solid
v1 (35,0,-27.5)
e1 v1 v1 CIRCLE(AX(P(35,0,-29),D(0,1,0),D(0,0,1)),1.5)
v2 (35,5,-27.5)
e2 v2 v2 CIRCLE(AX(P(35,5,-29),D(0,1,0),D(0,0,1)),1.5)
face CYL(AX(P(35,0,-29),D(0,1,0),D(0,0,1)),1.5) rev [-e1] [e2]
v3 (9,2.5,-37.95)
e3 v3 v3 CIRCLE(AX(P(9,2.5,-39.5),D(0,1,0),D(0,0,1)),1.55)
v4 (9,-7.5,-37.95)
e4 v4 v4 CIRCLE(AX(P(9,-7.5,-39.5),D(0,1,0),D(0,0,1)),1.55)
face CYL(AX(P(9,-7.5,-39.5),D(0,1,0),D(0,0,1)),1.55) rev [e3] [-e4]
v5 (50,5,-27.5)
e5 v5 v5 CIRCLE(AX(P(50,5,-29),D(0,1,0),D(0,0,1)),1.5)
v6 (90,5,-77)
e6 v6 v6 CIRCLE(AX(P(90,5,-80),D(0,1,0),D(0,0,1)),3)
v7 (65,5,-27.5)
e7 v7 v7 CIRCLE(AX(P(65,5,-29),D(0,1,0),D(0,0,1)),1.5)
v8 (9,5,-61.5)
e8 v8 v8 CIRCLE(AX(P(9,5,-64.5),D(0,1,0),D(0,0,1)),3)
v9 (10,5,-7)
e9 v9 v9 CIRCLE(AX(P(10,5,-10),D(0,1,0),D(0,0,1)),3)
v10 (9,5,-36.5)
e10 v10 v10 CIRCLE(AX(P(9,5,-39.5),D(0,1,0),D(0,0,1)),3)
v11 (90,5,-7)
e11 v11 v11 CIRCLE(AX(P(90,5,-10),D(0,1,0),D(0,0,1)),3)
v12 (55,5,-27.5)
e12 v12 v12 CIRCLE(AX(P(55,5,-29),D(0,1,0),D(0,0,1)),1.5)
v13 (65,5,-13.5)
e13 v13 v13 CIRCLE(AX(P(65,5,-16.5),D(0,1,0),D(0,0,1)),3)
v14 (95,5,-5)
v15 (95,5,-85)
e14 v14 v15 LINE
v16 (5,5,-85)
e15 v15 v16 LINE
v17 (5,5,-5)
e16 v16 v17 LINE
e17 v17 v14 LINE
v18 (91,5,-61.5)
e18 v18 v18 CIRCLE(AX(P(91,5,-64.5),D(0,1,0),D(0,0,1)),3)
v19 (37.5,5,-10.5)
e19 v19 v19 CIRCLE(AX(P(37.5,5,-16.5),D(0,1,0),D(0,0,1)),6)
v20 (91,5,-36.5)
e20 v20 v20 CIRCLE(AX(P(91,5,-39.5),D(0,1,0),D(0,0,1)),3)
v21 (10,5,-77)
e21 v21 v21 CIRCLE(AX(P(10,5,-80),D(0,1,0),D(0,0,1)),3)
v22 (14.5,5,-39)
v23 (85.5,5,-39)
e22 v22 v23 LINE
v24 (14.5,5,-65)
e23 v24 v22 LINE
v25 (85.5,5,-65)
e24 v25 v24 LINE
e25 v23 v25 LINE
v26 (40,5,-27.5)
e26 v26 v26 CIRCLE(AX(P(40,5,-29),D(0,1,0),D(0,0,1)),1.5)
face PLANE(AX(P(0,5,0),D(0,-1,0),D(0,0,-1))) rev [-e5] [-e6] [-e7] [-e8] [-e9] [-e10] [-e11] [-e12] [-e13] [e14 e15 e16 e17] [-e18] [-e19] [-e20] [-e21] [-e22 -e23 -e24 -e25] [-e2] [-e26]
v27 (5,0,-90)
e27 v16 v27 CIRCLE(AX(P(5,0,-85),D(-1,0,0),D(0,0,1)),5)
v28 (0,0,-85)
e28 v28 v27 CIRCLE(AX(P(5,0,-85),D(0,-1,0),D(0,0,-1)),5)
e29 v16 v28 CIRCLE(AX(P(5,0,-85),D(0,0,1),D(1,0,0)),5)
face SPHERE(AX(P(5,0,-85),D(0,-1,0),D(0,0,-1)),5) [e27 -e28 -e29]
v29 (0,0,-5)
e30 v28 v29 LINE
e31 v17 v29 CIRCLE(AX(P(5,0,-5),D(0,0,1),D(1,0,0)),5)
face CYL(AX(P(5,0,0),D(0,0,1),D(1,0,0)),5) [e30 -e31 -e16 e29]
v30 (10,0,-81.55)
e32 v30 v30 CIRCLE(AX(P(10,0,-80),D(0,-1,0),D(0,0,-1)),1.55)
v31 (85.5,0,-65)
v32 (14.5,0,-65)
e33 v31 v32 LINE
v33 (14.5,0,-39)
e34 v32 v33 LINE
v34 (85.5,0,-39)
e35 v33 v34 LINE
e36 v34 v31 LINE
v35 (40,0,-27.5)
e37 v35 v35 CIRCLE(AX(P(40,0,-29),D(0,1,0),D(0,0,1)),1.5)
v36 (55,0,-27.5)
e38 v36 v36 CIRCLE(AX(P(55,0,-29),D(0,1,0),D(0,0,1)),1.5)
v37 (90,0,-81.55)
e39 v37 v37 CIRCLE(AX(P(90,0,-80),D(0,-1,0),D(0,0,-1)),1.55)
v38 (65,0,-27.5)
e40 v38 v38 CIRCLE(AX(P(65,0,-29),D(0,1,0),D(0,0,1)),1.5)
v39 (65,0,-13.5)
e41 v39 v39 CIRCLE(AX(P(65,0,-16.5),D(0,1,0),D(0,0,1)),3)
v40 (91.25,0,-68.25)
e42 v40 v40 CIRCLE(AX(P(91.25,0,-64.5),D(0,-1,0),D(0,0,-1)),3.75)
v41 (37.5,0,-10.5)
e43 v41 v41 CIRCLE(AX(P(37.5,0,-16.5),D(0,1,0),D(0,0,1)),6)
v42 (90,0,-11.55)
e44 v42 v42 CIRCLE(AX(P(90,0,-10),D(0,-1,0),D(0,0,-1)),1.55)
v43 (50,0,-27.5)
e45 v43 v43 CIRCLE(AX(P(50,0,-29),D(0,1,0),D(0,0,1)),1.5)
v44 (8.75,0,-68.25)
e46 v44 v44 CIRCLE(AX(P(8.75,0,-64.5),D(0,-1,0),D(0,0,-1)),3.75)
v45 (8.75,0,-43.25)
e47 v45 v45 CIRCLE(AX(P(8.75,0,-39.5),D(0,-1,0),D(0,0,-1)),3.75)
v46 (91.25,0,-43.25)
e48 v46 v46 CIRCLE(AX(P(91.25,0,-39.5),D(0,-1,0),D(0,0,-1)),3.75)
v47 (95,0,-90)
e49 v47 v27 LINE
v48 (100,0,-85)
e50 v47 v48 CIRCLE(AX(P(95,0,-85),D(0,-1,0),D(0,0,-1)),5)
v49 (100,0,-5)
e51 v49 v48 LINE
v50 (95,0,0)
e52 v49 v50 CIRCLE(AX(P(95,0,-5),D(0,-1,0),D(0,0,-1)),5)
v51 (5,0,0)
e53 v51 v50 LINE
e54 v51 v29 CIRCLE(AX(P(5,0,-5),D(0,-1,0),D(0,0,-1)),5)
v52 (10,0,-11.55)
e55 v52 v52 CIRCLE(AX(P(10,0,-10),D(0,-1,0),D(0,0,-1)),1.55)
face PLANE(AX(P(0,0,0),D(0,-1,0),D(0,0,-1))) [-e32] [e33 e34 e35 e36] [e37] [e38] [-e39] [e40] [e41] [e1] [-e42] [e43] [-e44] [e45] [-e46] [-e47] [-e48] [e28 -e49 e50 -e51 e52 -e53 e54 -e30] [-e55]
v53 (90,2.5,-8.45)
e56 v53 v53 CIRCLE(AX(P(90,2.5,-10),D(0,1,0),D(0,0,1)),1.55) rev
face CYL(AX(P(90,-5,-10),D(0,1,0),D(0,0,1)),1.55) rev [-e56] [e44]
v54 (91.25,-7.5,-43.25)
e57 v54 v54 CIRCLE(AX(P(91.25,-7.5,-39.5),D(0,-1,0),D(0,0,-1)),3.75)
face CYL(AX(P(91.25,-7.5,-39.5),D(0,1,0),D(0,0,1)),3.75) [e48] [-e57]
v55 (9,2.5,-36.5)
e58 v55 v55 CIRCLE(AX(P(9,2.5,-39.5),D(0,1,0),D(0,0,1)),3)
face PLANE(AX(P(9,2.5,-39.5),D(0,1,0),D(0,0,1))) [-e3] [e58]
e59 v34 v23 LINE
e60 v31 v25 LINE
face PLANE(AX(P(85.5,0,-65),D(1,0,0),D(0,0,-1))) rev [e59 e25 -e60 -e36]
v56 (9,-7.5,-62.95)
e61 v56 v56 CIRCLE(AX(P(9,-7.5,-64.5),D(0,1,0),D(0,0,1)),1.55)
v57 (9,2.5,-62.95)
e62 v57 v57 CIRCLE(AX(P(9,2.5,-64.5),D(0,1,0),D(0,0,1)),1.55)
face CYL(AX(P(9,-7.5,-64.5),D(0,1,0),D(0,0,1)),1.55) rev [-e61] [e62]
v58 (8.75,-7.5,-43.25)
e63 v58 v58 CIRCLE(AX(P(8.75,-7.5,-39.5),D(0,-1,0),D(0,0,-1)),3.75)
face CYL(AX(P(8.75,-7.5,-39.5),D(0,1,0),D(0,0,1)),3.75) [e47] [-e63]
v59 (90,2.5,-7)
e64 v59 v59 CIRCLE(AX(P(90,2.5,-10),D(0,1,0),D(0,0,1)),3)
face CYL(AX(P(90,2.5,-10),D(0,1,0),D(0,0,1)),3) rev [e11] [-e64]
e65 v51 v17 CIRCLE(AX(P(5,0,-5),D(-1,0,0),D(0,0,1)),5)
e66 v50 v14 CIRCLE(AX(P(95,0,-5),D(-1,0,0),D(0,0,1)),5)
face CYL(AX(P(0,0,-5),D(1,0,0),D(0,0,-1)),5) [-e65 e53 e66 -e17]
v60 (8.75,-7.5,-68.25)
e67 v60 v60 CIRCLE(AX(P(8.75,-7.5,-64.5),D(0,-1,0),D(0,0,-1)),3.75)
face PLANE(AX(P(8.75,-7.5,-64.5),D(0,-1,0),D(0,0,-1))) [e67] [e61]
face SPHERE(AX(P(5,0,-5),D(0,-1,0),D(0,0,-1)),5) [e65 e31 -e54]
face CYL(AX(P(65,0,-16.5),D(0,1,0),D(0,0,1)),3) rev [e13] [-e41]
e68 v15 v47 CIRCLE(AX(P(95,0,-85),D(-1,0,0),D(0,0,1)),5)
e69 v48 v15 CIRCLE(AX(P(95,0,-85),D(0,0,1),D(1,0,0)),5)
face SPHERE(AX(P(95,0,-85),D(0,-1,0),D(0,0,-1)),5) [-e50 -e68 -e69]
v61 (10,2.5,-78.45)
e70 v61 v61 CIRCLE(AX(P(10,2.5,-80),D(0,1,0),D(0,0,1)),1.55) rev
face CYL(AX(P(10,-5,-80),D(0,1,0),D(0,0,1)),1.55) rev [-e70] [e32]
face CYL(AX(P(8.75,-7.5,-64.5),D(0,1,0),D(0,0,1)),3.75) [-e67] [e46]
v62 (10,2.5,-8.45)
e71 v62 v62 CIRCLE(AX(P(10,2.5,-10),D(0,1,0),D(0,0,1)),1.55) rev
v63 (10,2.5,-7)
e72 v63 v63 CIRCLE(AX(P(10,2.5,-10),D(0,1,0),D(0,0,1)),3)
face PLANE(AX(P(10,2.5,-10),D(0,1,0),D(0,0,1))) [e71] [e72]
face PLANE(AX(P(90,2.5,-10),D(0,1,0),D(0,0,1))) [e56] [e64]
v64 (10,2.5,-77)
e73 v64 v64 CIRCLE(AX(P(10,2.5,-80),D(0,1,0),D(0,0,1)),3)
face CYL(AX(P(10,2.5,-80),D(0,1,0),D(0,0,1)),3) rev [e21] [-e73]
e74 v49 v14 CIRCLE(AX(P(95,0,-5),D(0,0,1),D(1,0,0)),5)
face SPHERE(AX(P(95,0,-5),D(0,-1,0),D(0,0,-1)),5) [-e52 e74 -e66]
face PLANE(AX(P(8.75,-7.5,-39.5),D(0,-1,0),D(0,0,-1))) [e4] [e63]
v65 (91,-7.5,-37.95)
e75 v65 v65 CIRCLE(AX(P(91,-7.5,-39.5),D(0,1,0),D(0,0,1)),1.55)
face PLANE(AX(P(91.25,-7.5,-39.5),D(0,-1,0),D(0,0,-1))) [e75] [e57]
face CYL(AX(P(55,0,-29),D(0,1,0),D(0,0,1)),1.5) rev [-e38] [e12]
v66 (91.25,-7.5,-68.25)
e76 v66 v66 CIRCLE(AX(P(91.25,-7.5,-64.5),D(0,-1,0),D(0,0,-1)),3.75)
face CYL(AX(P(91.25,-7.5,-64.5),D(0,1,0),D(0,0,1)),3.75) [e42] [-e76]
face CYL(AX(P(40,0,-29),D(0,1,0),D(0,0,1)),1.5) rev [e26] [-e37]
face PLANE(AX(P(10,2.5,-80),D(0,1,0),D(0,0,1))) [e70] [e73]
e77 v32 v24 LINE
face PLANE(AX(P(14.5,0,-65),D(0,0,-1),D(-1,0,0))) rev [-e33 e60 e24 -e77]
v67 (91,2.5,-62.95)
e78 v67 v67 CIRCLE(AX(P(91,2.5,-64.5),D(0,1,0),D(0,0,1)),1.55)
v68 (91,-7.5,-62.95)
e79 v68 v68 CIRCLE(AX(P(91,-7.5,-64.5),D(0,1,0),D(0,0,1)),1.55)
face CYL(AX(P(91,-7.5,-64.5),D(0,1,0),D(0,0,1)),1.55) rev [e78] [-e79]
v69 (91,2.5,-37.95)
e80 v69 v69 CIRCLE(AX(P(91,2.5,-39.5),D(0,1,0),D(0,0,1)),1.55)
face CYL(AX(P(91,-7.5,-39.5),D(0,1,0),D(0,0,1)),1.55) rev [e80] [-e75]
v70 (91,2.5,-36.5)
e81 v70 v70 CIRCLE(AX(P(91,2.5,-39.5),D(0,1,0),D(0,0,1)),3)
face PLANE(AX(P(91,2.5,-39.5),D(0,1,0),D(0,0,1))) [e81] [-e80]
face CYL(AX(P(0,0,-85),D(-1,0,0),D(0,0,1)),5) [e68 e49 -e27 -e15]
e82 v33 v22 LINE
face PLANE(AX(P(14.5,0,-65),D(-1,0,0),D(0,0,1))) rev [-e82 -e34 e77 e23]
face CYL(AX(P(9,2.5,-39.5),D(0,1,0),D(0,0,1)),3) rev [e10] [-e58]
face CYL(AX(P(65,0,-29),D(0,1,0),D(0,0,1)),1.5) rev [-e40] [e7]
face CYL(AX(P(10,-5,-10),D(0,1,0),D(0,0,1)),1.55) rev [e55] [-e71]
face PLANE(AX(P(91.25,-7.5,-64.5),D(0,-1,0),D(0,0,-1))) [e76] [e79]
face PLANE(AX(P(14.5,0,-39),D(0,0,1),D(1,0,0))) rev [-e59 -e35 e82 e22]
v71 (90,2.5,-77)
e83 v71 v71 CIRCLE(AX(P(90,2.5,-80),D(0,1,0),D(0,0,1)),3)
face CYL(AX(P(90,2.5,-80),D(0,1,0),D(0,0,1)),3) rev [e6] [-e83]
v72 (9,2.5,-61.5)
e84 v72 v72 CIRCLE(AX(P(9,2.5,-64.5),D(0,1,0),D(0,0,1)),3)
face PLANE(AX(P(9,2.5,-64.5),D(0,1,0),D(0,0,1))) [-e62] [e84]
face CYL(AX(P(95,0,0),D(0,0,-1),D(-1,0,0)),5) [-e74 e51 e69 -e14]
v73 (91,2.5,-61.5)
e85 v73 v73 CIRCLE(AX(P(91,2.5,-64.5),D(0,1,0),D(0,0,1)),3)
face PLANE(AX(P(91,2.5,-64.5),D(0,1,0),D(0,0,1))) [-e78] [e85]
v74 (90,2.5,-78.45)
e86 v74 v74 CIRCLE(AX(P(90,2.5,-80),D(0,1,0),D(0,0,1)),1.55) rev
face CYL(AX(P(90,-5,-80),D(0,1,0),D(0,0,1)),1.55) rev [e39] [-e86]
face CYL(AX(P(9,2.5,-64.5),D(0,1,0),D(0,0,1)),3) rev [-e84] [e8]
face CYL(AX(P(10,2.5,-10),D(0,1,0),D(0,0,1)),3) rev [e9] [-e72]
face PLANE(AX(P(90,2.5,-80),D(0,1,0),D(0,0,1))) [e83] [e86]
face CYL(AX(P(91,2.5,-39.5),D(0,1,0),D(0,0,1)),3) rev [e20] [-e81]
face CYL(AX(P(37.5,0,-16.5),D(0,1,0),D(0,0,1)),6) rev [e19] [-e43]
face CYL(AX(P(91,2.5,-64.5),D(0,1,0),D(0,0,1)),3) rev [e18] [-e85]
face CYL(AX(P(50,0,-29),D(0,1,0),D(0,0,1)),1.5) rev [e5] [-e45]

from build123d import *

# Parameters (mm, degrees)
SKETCH1_W               = 100
SKETCH1_H               = 90
BOSS_EXTRUDE1_DEPTH     = 5
FILLET1_R               = 5
FILLET2_R               = 5
SKETCH2_R               = 1.55
CUT_EXTRUDE1_DEPTH      = 10
SKETCH3_R               = 3
CUT_EXTRUDE2_DEPTH      = 2.5
SKETCH4_R               = 1.5
SKETCH4_W               = 71
SKETCH4_H               = 26
CUT_EXTRUDE3_DEPTH      = 135.629120178
SKETCH5_R               = 1.5
CUT_EXTRUDE4_DEPTH      = 135.629120178
SKETCH8_R               = 3.75
BOSS_EXTRUDE3_DEPTH     = 7.5
SKETCH6_R               = 3
CUT_EXTRUDE5_DEPTH      = 2.5
CUT_EXTRUDE7_DEPTH      = 135.745129782
CUT_EXTRUDE7_DEPTH_BACK = 135.745129782
SKETCH10_R              = 1.55
SKETCH11_R              = 6
SKETCH11_R_2            = 3
CUT_EXTRUDE8_DEPTH      = 5


with BuildPart() as part:
    # Sketch1 → Boss-Extrude1 (new body)
    with BuildSketch(Plane(origin=(0, 0, 0), x_dir=(1, 0, 0), z_dir=(0, 1, 0))):
        with Locations((50, 45)):
            Rectangle(SKETCH1_W, SKETCH1_H)
    extrude(amount=BOSS_EXTRUDE1_DEPTH)

    # Fillet1
    fillet1_edges = [part.edges().sort_by_distance(p)[0] for p in [
        (0, 2.5, -90),
        (100, 2.5, -90),
        (100, 2.5, 0),
        (0, 2.5, 0),
    ]]
    fillet(fillet1_edges, radius=FILLET1_R)

    # Fillet2
    fillet2_edges = [part.edges().sort_by_distance(p)[0] for p in [
        (1.464466094, 5, -1.464466094),
        (98.535533906, 5, -88.535533906),
        (98.535533906, 5, -1.464466094),
        (100, 5, -45),
        (50, 5, 0),
        (0, 5, -45),
        (1.464466094, 5, -88.535533906),
        (50, 5, -90),
    ]]
    fillet(fillet2_edges, radius=FILLET2_R - 0.0001)  # a hair under: the kernel refuses the full size

    # Sketch2 → Cut-Extrude1 (cut)
    with BuildSketch(Plane(origin=(0, 5, 0), x_dir=(1, 0, 0), z_dir=(0, 1, 0))):
        with Locations(Location((10, 80, 0), (0, 0, 270))):
            Circle(SKETCH2_R)
        with Locations(Location((10, 10, 0), (0, 0, 270))):
            Circle(SKETCH2_R)
        with Locations(Location((90, 10, 0), (0, 0, 270))):
            Circle(SKETCH2_R)
        with Locations(Location((90, 80, 0), (0, 0, 270))):
            Circle(SKETCH2_R)
    extrude(amount=-CUT_EXTRUDE1_DEPTH, mode=Mode.SUBTRACT)

    # Sketch3 → Cut-Extrude2 (cut)
    with BuildSketch(Plane(origin=(0, 5, 0), x_dir=(1, 0, 0), z_dir=(0, 1, 0))):
        with Locations(Location((10, 80, 0), (0, 0, 270))):
            Circle(SKETCH3_R)
        with Locations(Location((90, 80, 0), (0, 0, 270))):
            Circle(SKETCH3_R)
        with Locations(Location((90, 10, 0), (0, 0, 270))):
            Circle(SKETCH3_R)
        with Locations(Location((10, 10, 0), (0, 0, 270))):
            Circle(SKETCH3_R)
    extrude(amount=-CUT_EXTRUDE2_DEPTH, mode=Mode.SUBTRACT)

    # Sketch4 → Cut-Extrude3 (cut, through all)
    with BuildSketch(Plane(origin=(0, 5, 0), x_dir=(1, 0, 0), z_dir=(0, 1, 0))):
        with Locations(Location((35, 29, 0), (0, 0, 270))):
            Circle(SKETCH4_R)
        with Locations(Location((40, 29, 0), (0, 0, 270))):
            Circle(SKETCH4_R)
        with Locations(Location((50, 29, 0), (0, 0, 270))):
            Circle(SKETCH4_R)
        with Locations(Location((55, 29, 0), (0, 0, 270))):
            Circle(SKETCH4_R)
        with Locations(Location((65, 29, 0), (0, 0, 270))):
            Circle(SKETCH4_R)
        with Locations((50, 52)):
            Rectangle(SKETCH4_W, SKETCH4_H)
    extrude(amount=-CUT_EXTRUDE3_DEPTH, mode=Mode.SUBTRACT)

    # Sketch5 → Cut-Extrude4 (cut, through all)
    with BuildSketch(Plane.XZ):
        with Locations(Location((9, -39.5, 0), (0, 0, 270))):
            Circle(SKETCH5_R)
        with Locations(Location((9, -64.5, 0), (0, 0, 270))):
            Circle(SKETCH5_R)
        with Locations(Location((91, -64.5, 0), (0, 0, 270))):
            Circle(SKETCH5_R)
        with Locations(Location((91, -39.5, 0), (0, 0, 270))):
            Circle(SKETCH5_R)
    extrude(amount=-CUT_EXTRUDE4_DEPTH, mode=Mode.SUBTRACT)

    # Sketch8 → Boss-Extrude3 (add)
    with BuildSketch(Plane.XZ):
        with Locations(Location((8.75, -39.5, 0), (0, 0, 270))):
            Circle(SKETCH8_R)
        with Locations(Location((91.25, -39.5, 0), (0, 0, 270))):
            Circle(SKETCH8_R)
        with Locations(Location((91.25, -64.5, 0), (0, 0, 270))):
            Circle(SKETCH8_R)
        with Locations(Location((8.75, -64.5, 0), (0, 0, 270))):
            Circle(SKETCH8_R)
    extrude(amount=BOSS_EXTRUDE3_DEPTH)

    # Sketch6 → Cut-Extrude5 (cut)
    with BuildSketch(Plane(origin=(0, 5, 0), x_dir=(1, 0, 0), z_dir=(0, 1, 0))):
        with Locations(Location((9, 39.5, 0), (0, 0, 270))):
            Circle(SKETCH6_R)
        with Locations(Location((9, 64.5, 0), (0, 0, 270))):
            Circle(SKETCH6_R)
        with Locations(Location((91, 64.5, 0), (0, 0, 270))):
            Circle(SKETCH6_R)
        with Locations(Location((91, 39.5, 0), (0, 0, 270))):
            Circle(SKETCH6_R)
    extrude(amount=-CUT_EXTRUDE5_DEPTH, mode=Mode.SUBTRACT)

    # Sketch10 → Cut-Extrude7 (cut, two sides: drawn at the far end of the back side and taken through both)
    with BuildSketch(Plane(origin=(0, 0, 0), x_dir=(1, 0, 0), z_dir=(0, 1, 0)).offset(-CUT_EXTRUDE7_DEPTH_BACK)):
        with Locations(Location((9, 64.5, 0), (0, 0, 270))):
            Circle(SKETCH10_R)
        with Locations(Location((9, 39.5, 0), (0, 0, 270))):
            Circle(SKETCH10_R)
        with Locations(Location((91, 39.5, 0), (0, 0, 270))):
            Circle(SKETCH10_R)
        with Locations(Location((91, 64.5, 0), (0, 0, 270))):
            Circle(SKETCH10_R)
    extrude(amount=CUT_EXTRUDE7_DEPTH + CUT_EXTRUDE7_DEPTH_BACK, mode=Mode.SUBTRACT)

    # Sketch11 → Cut-Extrude8 (cut)
    with BuildSketch(Plane(origin=(0, 5, 0), x_dir=(1, 0, 0), z_dir=(0, 1, 0))):
        with Locations(Location((37.5, 16.5, 0), (0, 0, 270))):
            Circle(SKETCH11_R)
        with Locations(Location((65, 16.5, 0), (0, 0, 270))):
            Circle(SKETCH11_R_2)
    extrude(amount=-CUT_EXTRUDE8_DEPTH, mode=Mode.SUBTRACT)


solid = part.part
